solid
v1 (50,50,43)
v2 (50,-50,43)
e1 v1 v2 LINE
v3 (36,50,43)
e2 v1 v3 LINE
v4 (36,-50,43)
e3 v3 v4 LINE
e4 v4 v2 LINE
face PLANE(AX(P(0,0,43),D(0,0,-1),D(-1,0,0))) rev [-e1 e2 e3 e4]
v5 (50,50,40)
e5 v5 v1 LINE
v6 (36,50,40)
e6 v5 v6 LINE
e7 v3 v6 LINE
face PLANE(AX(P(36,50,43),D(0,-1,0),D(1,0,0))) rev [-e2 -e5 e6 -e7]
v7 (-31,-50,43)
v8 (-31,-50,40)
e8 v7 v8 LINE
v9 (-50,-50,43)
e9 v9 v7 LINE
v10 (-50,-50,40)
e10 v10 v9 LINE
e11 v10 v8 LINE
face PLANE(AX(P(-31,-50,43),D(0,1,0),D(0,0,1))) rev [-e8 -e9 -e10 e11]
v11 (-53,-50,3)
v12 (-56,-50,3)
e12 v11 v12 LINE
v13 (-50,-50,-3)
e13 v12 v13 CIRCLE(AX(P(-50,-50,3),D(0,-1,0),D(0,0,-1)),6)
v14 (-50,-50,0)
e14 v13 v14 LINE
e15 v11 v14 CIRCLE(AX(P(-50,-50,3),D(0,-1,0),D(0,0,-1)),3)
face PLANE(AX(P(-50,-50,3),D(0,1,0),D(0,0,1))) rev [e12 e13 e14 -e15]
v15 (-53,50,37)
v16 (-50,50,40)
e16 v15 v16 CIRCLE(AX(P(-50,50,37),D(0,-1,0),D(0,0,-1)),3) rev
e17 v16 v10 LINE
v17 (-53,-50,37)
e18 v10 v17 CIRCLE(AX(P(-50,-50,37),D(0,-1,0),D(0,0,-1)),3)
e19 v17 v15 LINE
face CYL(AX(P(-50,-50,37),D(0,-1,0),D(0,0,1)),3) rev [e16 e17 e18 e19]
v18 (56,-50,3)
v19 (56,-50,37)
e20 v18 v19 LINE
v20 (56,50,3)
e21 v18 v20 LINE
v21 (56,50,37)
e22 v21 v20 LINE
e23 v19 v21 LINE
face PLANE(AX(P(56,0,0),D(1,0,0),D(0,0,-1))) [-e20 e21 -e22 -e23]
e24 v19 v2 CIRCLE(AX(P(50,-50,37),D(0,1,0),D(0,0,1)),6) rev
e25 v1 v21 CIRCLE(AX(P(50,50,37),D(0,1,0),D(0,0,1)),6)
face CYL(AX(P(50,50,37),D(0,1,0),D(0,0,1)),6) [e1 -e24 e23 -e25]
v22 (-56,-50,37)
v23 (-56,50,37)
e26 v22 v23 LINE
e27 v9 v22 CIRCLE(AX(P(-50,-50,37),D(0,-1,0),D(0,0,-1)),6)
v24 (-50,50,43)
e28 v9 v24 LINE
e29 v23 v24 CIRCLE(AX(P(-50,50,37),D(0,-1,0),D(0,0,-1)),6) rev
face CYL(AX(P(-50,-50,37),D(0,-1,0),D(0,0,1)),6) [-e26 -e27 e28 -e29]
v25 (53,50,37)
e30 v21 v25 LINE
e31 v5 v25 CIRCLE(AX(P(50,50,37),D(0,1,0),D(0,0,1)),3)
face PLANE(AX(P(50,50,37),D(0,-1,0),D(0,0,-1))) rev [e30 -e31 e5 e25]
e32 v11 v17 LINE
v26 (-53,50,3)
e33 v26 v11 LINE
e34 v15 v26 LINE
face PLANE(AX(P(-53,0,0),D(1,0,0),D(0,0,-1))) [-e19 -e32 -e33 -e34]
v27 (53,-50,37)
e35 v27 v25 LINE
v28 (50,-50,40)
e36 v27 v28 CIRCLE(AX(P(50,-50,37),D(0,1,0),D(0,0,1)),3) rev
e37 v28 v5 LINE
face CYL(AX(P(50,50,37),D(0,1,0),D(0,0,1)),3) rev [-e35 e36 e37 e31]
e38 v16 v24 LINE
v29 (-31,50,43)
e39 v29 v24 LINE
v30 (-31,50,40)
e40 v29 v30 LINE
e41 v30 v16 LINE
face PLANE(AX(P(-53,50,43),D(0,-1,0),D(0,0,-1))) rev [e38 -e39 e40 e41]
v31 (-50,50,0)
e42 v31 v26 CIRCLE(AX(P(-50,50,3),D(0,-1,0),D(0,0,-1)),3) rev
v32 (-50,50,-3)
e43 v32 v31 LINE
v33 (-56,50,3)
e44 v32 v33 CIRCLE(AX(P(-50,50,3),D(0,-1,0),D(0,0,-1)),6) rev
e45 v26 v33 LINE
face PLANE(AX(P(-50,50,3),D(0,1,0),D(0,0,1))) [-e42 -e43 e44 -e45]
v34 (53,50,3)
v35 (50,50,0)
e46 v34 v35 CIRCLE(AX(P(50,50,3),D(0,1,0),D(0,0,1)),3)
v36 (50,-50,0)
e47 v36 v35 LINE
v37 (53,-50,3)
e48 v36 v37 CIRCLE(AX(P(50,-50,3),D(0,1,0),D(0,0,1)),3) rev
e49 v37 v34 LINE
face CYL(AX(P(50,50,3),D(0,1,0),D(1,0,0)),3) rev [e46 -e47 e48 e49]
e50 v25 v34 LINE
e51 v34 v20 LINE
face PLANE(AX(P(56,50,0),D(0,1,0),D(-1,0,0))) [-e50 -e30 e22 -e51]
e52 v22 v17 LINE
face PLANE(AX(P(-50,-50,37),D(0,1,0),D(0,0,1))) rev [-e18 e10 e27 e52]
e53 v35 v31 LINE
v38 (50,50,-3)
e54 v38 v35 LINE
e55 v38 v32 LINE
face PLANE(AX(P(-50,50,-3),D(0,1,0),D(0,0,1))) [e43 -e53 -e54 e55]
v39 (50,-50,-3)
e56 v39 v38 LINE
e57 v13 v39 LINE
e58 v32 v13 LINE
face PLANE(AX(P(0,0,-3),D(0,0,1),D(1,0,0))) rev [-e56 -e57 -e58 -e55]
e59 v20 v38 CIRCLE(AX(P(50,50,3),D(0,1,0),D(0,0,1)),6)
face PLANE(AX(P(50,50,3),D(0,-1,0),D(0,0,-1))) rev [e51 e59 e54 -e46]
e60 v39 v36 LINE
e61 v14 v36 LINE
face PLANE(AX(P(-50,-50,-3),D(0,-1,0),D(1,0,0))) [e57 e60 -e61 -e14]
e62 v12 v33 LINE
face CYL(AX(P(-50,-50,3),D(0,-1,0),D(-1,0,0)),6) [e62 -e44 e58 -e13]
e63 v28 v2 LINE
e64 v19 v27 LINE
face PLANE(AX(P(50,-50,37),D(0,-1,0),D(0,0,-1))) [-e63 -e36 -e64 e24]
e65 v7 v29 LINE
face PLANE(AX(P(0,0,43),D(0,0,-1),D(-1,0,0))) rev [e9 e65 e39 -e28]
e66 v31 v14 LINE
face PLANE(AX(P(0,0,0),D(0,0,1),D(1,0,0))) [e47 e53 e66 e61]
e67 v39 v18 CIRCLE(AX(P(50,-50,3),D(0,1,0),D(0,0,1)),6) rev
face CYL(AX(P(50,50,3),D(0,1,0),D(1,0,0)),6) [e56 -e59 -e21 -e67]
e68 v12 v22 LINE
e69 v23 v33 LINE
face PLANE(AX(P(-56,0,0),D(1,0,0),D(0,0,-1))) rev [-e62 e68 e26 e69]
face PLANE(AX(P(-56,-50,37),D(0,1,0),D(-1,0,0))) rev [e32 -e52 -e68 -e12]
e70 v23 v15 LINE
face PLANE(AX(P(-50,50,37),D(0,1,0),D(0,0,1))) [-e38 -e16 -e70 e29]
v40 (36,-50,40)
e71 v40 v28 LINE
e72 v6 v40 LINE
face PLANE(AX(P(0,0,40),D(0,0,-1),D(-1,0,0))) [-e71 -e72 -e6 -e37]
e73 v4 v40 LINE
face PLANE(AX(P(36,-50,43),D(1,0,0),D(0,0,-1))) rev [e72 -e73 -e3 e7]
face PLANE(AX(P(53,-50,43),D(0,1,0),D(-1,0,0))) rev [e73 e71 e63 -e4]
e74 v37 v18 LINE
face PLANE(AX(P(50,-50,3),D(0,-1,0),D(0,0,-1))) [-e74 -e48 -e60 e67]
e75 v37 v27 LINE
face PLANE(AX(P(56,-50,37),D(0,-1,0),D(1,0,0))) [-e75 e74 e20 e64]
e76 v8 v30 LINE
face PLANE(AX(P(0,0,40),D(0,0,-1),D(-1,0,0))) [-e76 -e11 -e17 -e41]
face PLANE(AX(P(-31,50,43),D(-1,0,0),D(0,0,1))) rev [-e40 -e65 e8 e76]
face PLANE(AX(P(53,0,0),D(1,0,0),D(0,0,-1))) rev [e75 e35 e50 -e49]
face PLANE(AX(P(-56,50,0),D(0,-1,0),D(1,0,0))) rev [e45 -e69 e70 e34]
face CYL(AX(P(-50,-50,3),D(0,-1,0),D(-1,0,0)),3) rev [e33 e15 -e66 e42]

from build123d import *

# Parameters (mm, degrees)
SKETCH1_W          = 100
SKETCH1_H          = 100
BASE_FLANGE1_DEPTH = 3
EDGE_FLANGE1_DEPTH = 100
EDGE_FLANGE2_DEPTH = 100
EDGE_FLANGE6_DEPTH = 100
EDGE_FLANGE7_DEPTH = 100


# Sheet-metal steps are written as plain solids
with BuildPart() as part:
    # Sketch1 → Base-Flange1 (new body)
    with BuildSketch(Plane.XY):
        Rectangle(SKETCH1_W, SKETCH1_H)
    extrude(amount=-BASE_FLANGE1_DEPTH)

    # Edge-Flange1 section (across the edge) → Edge-Flange1 (add)
    with BuildSketch(Plane(origin=(-53, 50, 0), x_dir=(1, 0, 0), z_dir=(0, -1, 0))):
        with BuildLine():
            Line((-3, 3), (-3, 37))
            Line((-3, 37), (0, 37))
            Line((0, 37), (0, 3))
            ThreePointArc((0, 3), (0.878679656, 0.878679656), (3, 0))
            Line((3, 0), (3, -3))
            ThreePointArc((3, -3), (-1.242640687, -1.242640687), (-3, 3))
        make_face()
    extrude(amount=EDGE_FLANGE1_DEPTH)

    # Edge-Flange2 section (across the edge) → Edge-Flange2 (add)
    with BuildSketch(Plane(origin=(53, -50, 0), x_dir=(-1, 0, 0), z_dir=(0, 1, 0))):
        with BuildLine():
            Line((-3, 3), (-3, 37))
            Line((-3, 37), (0, 37))
            Line((0, 37), (0, 3))
            ThreePointArc((0, 3), (0.878679656, 0.878679656), (3, 0))
            Line((3, 0), (3, -3))
            ThreePointArc((3, -3), (-1.242640687, -1.242640687), (-3, 3))
        make_face()
    extrude(amount=EDGE_FLANGE2_DEPTH)

    # Edge-Flange6 section (across the edge) → Edge-Flange6 (add)
    with BuildSketch(Plane(origin=(-53, 50, 40), x_dir=(0, 0, -1), z_dir=(0, -1, 0))):
        with BuildLine():
            Line((-3, 3), (-3, 22))
            Line((-3, 22), (0, 22))
            Line((0, 22), (0, 3))
            ThreePointArc((0, 3), (0.878679656, 0.878679656), (3, 0))
            Line((3, 0), (3, -3))
            ThreePointArc((3, -3), (-1.242640687, -1.242640687), (-3, 3))
        make_face()
    extrude(amount=EDGE_FLANGE6_DEPTH)

    # Edge-Flange7 section (across the edge) → Edge-Flange7 (add)
    with BuildSketch(Plane(origin=(53, -50, 40), x_dir=(0, 0, -1), z_dir=(0, 1, 0))):
        with BuildLine():
            Line((-3, 3), (-3, 17))
            Line((-3, 17), (0, 17))
            Line((0, 17), (0, 3))
            ThreePointArc((0, 3), (0.878679656, 0.878679656), (3, 0))
            Line((3, 0), (3, -3))
            ThreePointArc((3, -3), (-1.242640687, -1.242640687), (-3, 3))
        make_face()
    extrude(amount=EDGE_FLANGE7_DEPTH)


solid = part.part
